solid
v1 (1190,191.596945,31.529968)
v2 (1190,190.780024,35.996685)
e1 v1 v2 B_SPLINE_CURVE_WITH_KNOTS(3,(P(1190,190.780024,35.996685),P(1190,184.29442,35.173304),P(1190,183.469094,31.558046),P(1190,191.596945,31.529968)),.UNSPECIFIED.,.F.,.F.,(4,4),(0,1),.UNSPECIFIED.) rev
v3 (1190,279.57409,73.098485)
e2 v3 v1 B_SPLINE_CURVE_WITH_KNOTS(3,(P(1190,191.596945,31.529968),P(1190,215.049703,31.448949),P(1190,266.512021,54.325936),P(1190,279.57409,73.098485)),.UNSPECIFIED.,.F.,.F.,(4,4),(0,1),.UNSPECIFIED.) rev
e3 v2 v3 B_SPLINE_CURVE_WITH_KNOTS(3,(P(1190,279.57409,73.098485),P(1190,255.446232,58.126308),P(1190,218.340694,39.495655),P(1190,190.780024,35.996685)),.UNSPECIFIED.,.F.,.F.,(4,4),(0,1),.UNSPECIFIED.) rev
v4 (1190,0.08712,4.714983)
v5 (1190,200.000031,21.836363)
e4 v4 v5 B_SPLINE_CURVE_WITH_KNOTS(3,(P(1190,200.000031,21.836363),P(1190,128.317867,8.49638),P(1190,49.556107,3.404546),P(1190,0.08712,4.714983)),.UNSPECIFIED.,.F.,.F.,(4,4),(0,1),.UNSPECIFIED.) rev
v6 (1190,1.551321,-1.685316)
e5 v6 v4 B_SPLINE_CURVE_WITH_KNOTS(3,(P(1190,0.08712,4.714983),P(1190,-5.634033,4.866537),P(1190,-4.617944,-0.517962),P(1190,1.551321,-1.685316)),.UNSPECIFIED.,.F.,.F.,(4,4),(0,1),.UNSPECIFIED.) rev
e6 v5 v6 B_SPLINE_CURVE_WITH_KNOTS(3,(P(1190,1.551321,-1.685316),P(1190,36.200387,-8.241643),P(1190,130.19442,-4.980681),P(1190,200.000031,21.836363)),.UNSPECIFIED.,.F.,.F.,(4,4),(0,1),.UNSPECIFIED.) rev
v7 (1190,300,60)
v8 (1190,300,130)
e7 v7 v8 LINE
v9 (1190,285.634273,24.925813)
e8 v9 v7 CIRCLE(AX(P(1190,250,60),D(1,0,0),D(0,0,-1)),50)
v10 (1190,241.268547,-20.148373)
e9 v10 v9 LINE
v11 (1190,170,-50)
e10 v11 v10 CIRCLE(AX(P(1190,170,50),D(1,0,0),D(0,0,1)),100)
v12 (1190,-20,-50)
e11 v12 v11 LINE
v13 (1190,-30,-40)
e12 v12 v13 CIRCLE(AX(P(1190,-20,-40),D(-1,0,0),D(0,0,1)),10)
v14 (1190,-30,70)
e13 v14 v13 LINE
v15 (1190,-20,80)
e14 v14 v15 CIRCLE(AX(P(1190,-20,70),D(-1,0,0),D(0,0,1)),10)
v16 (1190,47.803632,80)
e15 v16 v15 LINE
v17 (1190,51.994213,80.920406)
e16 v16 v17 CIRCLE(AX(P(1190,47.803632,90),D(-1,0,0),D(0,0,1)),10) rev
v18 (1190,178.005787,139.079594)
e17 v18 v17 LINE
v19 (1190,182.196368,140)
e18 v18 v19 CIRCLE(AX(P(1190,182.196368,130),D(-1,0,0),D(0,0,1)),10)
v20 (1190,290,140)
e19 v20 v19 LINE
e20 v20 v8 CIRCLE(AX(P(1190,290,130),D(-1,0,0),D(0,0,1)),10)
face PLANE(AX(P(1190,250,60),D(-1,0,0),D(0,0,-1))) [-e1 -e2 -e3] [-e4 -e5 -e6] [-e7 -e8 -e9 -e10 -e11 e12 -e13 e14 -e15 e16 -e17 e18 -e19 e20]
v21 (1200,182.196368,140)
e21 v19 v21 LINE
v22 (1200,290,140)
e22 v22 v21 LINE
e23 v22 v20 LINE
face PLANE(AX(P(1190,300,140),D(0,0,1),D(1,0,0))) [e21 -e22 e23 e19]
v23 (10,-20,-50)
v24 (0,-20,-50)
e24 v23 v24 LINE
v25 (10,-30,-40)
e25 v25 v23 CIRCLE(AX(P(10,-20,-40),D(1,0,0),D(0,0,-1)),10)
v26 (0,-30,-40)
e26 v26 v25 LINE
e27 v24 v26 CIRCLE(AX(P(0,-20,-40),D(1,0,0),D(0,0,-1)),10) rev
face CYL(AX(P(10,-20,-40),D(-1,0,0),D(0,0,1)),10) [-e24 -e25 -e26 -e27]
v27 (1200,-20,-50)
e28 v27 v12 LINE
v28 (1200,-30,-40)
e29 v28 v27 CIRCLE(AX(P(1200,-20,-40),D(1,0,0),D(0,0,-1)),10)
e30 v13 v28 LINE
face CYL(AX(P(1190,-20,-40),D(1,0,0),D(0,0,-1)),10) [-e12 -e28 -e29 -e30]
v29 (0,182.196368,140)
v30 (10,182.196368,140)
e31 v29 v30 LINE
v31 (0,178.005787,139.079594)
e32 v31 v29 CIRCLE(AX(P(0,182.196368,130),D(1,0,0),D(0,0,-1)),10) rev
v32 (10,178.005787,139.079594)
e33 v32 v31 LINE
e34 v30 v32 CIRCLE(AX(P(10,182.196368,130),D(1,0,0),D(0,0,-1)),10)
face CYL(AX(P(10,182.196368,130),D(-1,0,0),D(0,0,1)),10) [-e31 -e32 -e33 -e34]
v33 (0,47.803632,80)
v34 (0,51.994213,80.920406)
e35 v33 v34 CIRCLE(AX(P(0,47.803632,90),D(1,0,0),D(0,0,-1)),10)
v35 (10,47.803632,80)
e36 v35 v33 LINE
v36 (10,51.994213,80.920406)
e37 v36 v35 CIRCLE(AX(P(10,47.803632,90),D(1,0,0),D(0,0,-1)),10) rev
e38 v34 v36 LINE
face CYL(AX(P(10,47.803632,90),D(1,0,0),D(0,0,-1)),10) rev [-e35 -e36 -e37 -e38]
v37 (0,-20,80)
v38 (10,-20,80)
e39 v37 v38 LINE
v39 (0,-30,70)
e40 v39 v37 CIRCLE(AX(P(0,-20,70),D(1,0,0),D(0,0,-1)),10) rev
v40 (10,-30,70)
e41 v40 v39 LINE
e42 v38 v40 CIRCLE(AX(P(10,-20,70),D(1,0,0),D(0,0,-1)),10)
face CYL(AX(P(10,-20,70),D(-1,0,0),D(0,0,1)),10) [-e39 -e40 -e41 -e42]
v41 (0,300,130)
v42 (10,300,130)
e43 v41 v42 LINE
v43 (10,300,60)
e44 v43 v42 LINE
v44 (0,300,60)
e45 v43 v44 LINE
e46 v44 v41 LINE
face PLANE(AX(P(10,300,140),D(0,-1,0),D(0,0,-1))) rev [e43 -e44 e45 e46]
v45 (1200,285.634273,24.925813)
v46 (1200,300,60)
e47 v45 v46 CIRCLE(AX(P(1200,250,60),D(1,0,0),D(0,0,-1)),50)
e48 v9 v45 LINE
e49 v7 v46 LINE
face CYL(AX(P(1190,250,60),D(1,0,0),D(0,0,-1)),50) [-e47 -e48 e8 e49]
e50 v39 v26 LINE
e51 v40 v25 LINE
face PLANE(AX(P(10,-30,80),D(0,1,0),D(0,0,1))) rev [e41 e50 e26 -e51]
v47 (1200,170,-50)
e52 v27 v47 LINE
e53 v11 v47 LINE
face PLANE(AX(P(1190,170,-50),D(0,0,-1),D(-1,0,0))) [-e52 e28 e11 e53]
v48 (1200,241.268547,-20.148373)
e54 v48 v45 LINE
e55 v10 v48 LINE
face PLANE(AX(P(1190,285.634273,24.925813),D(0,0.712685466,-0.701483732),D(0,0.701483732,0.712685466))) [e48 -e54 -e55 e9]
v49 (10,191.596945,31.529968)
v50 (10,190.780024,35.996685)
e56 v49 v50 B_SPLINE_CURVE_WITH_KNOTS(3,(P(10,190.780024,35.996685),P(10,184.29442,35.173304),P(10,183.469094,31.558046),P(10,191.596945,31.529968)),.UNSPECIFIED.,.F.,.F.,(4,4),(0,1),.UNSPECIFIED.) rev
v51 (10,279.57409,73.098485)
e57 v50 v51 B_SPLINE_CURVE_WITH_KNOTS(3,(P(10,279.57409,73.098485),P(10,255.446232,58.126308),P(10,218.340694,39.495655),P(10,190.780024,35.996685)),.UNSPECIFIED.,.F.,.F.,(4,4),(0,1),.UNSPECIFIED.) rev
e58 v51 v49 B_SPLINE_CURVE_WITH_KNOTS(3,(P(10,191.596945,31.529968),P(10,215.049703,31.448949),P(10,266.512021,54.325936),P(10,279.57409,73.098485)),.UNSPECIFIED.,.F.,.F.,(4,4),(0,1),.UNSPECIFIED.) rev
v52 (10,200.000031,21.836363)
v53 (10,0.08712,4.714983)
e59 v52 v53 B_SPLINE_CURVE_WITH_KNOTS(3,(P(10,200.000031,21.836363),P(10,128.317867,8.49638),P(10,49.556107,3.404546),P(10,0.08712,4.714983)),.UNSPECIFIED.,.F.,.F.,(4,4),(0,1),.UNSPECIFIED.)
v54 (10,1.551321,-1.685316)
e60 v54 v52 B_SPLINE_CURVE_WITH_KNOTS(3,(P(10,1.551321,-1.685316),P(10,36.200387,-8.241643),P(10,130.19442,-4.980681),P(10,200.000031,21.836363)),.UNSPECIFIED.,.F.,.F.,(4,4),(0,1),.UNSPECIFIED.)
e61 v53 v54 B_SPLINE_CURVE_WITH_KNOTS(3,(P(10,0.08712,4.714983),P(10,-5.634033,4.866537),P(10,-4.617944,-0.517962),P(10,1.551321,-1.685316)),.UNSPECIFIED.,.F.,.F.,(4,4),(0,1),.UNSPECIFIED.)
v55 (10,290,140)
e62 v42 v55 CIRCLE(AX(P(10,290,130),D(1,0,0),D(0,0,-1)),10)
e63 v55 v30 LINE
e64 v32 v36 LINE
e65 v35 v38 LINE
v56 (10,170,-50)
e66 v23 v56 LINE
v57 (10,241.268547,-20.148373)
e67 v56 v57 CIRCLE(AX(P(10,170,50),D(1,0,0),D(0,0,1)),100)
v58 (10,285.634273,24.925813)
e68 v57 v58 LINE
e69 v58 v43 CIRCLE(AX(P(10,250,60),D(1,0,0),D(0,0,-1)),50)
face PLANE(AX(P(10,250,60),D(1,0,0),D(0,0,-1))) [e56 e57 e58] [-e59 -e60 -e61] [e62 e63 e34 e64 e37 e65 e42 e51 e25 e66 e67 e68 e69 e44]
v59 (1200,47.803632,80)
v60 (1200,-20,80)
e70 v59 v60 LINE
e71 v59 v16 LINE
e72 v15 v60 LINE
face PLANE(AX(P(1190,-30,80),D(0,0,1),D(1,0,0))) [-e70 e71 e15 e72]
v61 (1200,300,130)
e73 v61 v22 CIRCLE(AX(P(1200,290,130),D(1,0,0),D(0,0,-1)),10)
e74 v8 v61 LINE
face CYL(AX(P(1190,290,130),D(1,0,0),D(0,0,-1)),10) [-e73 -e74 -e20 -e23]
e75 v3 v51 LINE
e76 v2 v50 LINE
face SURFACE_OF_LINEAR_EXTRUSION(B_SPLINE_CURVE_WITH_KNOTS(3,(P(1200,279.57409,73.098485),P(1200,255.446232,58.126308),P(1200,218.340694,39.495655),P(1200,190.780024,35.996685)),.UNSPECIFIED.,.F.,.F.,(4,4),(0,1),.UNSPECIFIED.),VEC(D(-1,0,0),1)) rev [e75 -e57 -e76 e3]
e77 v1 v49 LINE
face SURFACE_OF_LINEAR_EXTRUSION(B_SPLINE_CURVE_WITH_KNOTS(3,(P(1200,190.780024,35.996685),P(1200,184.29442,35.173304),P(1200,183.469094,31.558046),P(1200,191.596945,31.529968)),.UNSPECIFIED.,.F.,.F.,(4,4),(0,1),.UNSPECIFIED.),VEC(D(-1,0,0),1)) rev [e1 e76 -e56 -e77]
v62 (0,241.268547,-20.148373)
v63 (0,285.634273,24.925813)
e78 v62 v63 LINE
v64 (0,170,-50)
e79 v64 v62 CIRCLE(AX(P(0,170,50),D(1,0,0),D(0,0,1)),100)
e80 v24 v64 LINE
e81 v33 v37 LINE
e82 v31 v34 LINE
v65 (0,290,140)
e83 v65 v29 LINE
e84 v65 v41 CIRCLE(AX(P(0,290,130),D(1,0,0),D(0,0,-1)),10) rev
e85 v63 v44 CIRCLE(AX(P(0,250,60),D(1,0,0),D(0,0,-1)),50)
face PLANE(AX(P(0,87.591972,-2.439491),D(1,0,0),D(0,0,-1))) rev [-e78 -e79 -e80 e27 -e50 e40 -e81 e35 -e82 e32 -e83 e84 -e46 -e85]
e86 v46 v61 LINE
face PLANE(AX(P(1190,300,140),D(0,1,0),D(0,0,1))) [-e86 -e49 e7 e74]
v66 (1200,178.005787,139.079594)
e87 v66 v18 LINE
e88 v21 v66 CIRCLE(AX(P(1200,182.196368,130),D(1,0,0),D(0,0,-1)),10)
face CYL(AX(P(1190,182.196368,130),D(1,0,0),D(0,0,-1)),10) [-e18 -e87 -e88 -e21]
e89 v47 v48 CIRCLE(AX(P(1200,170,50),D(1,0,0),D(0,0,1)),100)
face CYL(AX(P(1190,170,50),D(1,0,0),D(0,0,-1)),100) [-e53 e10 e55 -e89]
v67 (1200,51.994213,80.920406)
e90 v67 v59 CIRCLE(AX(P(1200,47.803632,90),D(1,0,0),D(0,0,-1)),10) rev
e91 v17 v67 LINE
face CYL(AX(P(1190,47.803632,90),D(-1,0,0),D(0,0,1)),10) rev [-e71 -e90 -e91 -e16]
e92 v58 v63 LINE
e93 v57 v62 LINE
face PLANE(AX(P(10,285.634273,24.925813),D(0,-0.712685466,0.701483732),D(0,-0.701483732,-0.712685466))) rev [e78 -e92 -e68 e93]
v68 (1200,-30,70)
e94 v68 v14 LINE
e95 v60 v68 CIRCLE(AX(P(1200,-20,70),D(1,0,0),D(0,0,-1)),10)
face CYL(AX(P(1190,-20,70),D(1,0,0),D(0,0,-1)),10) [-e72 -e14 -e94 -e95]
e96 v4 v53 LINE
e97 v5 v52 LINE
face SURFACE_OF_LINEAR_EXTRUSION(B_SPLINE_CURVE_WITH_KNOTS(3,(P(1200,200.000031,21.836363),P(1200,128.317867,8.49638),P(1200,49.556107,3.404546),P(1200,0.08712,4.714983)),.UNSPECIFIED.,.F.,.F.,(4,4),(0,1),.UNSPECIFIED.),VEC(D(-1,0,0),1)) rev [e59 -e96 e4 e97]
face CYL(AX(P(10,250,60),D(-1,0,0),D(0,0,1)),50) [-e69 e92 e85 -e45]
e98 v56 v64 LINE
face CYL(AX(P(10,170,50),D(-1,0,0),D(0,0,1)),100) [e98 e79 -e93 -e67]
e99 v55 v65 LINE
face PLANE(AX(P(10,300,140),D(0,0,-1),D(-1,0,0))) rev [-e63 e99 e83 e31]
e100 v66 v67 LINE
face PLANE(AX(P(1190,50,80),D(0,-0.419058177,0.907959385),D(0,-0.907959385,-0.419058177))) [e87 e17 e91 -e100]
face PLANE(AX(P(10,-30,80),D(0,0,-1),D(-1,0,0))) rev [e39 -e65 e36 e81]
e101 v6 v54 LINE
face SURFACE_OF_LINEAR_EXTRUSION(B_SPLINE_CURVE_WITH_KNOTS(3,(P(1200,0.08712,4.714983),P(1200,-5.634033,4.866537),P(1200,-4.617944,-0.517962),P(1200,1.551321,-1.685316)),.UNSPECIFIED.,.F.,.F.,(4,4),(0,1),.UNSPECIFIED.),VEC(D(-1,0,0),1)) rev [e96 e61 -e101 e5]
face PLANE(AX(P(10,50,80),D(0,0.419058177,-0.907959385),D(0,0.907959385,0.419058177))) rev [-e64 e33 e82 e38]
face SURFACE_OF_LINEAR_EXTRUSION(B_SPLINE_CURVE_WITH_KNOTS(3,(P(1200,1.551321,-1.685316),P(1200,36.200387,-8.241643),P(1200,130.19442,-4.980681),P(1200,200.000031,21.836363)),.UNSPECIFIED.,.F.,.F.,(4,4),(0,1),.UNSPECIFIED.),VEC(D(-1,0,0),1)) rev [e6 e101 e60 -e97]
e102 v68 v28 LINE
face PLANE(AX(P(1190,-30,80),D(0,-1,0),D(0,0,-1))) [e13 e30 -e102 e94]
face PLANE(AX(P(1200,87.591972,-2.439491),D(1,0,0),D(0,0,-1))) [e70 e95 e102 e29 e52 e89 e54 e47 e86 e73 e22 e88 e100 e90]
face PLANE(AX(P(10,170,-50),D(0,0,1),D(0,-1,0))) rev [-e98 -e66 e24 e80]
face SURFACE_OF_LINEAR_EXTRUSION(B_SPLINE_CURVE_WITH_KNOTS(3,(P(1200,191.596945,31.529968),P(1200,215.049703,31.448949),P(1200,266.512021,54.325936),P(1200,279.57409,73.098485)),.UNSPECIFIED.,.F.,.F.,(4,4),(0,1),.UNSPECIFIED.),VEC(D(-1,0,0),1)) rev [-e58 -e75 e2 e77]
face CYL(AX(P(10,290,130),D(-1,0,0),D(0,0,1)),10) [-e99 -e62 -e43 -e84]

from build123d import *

# Parameters (mm, degrees)
AUFSATZ_LINEAR_AUSTRAGEN1_DEPTH = 1200
AUFSATZ_LINEAR_AUSTRAGEN2_DEPTH = 10
VERRUNDUNG1_R                   = 10
VERRUNDUNG2_R                   = 10
VERRUNDUNG3_R                   = 10
VERRUNDUNG4_R                   = 10
VERRUNDUNG5_R                   = 10
VERRUNDUNG6_R                   = 10
VERRUNDUNG7_R                   = 10
VERRUNDUNG8_R                   = 10
VERRUNDUNG9_R                   = 10


# Read off the part's stored shape, not the designer's step: Aufsatz-Linear austragen1
with BuildPart() as part:
    # Aufsatz-Linear austragen1 outline → Aufsatz-Linear austragen1 (new body)
    with BuildSketch(Plane.YZ):
        with BuildLine():
            add(Edge.make_bspline(
                [(0.087119677, 4.714982833), (-5.634033384, 4.866536556), (-4.617943663, -0.517961985), (1.551321063, -1.685315818)],
                knots=[0, 0, 0, 0, 1, 1, 1, 1], degree=3))
            add(Edge.make_bspline(
                [(1.551321063, -1.685315818), (36.200387324, -8.241643369), (130.194419575, -4.980681367), (200.000031119, 21.83636299)],
                knots=[0, 0, 0, 0, 1, 1, 1, 1], degree=3))
            add(Edge.make_bspline(
                [(200.000031119, 21.83636299), (128.317866722, 8.496380037), (49.556107203, 3.404546077), (0.087119677, 4.714982833)],
                knots=[0, 0, 0, 0, 1, 1, 1, 1], degree=3))
        make_face()
        with BuildLine():
            add(Edge.make_bspline(
                [(190.780024332, 35.996685389), (184.294419724, 35.173304352), (183.469094432, 31.558045666), (191.596944862, 31.529967587)],
                knots=[0, 0, 0, 0, 1, 1, 1, 1], degree=3))
            add(Edge.make_bspline(
                [(191.596944862, 31.529967587), (215.049703063, 31.448948823), (266.512020936, 54.325936425), (279.574089528, 73.098484798)],
                knots=[0, 0, 0, 0, 1, 1, 1, 1], degree=3))
            add(Edge.make_bspline(
                [(279.574089528, 73.098484798), (255.446232322, 58.126308272), (218.340693981, 39.495654893), (190.780024332, 35.996685389)],
                knots=[0, 0, 0, 0, 1, 1, 1, 1], degree=3))
        make_face()
    extrude(amount=AUFSATZ_LINEAR_AUSTRAGEN1_DEPTH)

    # Skizze2 → Aufsatz-Linear austragen2 (add)
    with BuildSketch(Plane.YZ):
        with BuildLine():
            Line((285.634273323, 24.925813413), (241.268546647, -20.148373173))
            ThreePointArc((241.268546647, -20.148373173), (208.633940277, -42.235669124), (170, -50))
            Line((170, -50), (-30, -50))
            Line((-30, -50), (-30, 80))
            Line((-30, 80), (50, 80))
            Line((50, 80), (180, 140))
            Line((180, 140), (300, 140))
            Line((300, 140), (300, 60))
            ThreePointArc((300, 60), (296.269394129, 41.048927025), (285.634273323, 24.925813413))
        make_face()
    aufsatz_linear_austragen2 = extrude(amount=AUFSATZ_LINEAR_AUSTRAGEN2_DEPTH)

    # Spiegeln4: Aufsatz-Linear austragen2 across plane
    add(aufsatz_linear_austragen2.mirror(Plane(origin=(600, 0, 0), x_dir=(0, 0, 1), z_dir=(1, 0, 0))))

    # Verrundung1
    verrundung1_edges = [part.edges().sort_by_distance(p)[0] for p in [
        (5, 300, 140),
    ]]
    fillet(verrundung1_edges, radius=VERRUNDUNG1_R)

    # Verrundung2
    verrundung2_edges = [part.edges().sort_by_distance(p)[0] for p in [
        (5, 180, 140),
    ]]
    fillet(verrundung2_edges, radius=VERRUNDUNG2_R)

    # Verrundung3
    verrundung3_edges = [part.edges().sort_by_distance(p)[0] for p in [
        (5, 50, 80),
    ]]
    fillet(verrundung3_edges, radius=VERRUNDUNG3_R)

    # Verrundung4
    verrundung4_edges = [part.edges().sort_by_distance(p)[0] for p in [
        (5, -30, 80),
        (5, -30, -50),
    ]]
    fillet(verrundung4_edges, radius=VERRUNDUNG4_R)

    # Verrundung5
    verrundung5_edges = [part.edges().sort_by_distance(p)[0] for p in [
        (1195, 300, 140),
    ]]
    fillet(verrundung5_edges, radius=VERRUNDUNG5_R)

    # Verrundung6
    verrundung6_edges = [part.edges().sort_by_distance(p)[0] for p in [
        (1195, 180, 140),
    ]]
    fillet(verrundung6_edges, radius=VERRUNDUNG6_R)

    # Verrundung7
    verrundung7_edges = [part.edges().sort_by_distance(p)[0] for p in [
        (1195, 50, 80),
    ]]
    fillet(verrundung7_edges, radius=VERRUNDUNG7_R)

    # Verrundung8
    verrundung8_edges = [part.edges().sort_by_distance(p)[0] for p in [
        (1195, -30, 80),
    ]]
    fillet(verrundung8_edges, radius=VERRUNDUNG8_R)

    # Verrundung9
    verrundung9_edges = [part.edges().sort_by_distance(p)[0] for p in [
        (1195, -30, -50),
    ]]
    fillet(verrundung9_edges, radius=VERRUNDUNG9_R)


solid = part.part
